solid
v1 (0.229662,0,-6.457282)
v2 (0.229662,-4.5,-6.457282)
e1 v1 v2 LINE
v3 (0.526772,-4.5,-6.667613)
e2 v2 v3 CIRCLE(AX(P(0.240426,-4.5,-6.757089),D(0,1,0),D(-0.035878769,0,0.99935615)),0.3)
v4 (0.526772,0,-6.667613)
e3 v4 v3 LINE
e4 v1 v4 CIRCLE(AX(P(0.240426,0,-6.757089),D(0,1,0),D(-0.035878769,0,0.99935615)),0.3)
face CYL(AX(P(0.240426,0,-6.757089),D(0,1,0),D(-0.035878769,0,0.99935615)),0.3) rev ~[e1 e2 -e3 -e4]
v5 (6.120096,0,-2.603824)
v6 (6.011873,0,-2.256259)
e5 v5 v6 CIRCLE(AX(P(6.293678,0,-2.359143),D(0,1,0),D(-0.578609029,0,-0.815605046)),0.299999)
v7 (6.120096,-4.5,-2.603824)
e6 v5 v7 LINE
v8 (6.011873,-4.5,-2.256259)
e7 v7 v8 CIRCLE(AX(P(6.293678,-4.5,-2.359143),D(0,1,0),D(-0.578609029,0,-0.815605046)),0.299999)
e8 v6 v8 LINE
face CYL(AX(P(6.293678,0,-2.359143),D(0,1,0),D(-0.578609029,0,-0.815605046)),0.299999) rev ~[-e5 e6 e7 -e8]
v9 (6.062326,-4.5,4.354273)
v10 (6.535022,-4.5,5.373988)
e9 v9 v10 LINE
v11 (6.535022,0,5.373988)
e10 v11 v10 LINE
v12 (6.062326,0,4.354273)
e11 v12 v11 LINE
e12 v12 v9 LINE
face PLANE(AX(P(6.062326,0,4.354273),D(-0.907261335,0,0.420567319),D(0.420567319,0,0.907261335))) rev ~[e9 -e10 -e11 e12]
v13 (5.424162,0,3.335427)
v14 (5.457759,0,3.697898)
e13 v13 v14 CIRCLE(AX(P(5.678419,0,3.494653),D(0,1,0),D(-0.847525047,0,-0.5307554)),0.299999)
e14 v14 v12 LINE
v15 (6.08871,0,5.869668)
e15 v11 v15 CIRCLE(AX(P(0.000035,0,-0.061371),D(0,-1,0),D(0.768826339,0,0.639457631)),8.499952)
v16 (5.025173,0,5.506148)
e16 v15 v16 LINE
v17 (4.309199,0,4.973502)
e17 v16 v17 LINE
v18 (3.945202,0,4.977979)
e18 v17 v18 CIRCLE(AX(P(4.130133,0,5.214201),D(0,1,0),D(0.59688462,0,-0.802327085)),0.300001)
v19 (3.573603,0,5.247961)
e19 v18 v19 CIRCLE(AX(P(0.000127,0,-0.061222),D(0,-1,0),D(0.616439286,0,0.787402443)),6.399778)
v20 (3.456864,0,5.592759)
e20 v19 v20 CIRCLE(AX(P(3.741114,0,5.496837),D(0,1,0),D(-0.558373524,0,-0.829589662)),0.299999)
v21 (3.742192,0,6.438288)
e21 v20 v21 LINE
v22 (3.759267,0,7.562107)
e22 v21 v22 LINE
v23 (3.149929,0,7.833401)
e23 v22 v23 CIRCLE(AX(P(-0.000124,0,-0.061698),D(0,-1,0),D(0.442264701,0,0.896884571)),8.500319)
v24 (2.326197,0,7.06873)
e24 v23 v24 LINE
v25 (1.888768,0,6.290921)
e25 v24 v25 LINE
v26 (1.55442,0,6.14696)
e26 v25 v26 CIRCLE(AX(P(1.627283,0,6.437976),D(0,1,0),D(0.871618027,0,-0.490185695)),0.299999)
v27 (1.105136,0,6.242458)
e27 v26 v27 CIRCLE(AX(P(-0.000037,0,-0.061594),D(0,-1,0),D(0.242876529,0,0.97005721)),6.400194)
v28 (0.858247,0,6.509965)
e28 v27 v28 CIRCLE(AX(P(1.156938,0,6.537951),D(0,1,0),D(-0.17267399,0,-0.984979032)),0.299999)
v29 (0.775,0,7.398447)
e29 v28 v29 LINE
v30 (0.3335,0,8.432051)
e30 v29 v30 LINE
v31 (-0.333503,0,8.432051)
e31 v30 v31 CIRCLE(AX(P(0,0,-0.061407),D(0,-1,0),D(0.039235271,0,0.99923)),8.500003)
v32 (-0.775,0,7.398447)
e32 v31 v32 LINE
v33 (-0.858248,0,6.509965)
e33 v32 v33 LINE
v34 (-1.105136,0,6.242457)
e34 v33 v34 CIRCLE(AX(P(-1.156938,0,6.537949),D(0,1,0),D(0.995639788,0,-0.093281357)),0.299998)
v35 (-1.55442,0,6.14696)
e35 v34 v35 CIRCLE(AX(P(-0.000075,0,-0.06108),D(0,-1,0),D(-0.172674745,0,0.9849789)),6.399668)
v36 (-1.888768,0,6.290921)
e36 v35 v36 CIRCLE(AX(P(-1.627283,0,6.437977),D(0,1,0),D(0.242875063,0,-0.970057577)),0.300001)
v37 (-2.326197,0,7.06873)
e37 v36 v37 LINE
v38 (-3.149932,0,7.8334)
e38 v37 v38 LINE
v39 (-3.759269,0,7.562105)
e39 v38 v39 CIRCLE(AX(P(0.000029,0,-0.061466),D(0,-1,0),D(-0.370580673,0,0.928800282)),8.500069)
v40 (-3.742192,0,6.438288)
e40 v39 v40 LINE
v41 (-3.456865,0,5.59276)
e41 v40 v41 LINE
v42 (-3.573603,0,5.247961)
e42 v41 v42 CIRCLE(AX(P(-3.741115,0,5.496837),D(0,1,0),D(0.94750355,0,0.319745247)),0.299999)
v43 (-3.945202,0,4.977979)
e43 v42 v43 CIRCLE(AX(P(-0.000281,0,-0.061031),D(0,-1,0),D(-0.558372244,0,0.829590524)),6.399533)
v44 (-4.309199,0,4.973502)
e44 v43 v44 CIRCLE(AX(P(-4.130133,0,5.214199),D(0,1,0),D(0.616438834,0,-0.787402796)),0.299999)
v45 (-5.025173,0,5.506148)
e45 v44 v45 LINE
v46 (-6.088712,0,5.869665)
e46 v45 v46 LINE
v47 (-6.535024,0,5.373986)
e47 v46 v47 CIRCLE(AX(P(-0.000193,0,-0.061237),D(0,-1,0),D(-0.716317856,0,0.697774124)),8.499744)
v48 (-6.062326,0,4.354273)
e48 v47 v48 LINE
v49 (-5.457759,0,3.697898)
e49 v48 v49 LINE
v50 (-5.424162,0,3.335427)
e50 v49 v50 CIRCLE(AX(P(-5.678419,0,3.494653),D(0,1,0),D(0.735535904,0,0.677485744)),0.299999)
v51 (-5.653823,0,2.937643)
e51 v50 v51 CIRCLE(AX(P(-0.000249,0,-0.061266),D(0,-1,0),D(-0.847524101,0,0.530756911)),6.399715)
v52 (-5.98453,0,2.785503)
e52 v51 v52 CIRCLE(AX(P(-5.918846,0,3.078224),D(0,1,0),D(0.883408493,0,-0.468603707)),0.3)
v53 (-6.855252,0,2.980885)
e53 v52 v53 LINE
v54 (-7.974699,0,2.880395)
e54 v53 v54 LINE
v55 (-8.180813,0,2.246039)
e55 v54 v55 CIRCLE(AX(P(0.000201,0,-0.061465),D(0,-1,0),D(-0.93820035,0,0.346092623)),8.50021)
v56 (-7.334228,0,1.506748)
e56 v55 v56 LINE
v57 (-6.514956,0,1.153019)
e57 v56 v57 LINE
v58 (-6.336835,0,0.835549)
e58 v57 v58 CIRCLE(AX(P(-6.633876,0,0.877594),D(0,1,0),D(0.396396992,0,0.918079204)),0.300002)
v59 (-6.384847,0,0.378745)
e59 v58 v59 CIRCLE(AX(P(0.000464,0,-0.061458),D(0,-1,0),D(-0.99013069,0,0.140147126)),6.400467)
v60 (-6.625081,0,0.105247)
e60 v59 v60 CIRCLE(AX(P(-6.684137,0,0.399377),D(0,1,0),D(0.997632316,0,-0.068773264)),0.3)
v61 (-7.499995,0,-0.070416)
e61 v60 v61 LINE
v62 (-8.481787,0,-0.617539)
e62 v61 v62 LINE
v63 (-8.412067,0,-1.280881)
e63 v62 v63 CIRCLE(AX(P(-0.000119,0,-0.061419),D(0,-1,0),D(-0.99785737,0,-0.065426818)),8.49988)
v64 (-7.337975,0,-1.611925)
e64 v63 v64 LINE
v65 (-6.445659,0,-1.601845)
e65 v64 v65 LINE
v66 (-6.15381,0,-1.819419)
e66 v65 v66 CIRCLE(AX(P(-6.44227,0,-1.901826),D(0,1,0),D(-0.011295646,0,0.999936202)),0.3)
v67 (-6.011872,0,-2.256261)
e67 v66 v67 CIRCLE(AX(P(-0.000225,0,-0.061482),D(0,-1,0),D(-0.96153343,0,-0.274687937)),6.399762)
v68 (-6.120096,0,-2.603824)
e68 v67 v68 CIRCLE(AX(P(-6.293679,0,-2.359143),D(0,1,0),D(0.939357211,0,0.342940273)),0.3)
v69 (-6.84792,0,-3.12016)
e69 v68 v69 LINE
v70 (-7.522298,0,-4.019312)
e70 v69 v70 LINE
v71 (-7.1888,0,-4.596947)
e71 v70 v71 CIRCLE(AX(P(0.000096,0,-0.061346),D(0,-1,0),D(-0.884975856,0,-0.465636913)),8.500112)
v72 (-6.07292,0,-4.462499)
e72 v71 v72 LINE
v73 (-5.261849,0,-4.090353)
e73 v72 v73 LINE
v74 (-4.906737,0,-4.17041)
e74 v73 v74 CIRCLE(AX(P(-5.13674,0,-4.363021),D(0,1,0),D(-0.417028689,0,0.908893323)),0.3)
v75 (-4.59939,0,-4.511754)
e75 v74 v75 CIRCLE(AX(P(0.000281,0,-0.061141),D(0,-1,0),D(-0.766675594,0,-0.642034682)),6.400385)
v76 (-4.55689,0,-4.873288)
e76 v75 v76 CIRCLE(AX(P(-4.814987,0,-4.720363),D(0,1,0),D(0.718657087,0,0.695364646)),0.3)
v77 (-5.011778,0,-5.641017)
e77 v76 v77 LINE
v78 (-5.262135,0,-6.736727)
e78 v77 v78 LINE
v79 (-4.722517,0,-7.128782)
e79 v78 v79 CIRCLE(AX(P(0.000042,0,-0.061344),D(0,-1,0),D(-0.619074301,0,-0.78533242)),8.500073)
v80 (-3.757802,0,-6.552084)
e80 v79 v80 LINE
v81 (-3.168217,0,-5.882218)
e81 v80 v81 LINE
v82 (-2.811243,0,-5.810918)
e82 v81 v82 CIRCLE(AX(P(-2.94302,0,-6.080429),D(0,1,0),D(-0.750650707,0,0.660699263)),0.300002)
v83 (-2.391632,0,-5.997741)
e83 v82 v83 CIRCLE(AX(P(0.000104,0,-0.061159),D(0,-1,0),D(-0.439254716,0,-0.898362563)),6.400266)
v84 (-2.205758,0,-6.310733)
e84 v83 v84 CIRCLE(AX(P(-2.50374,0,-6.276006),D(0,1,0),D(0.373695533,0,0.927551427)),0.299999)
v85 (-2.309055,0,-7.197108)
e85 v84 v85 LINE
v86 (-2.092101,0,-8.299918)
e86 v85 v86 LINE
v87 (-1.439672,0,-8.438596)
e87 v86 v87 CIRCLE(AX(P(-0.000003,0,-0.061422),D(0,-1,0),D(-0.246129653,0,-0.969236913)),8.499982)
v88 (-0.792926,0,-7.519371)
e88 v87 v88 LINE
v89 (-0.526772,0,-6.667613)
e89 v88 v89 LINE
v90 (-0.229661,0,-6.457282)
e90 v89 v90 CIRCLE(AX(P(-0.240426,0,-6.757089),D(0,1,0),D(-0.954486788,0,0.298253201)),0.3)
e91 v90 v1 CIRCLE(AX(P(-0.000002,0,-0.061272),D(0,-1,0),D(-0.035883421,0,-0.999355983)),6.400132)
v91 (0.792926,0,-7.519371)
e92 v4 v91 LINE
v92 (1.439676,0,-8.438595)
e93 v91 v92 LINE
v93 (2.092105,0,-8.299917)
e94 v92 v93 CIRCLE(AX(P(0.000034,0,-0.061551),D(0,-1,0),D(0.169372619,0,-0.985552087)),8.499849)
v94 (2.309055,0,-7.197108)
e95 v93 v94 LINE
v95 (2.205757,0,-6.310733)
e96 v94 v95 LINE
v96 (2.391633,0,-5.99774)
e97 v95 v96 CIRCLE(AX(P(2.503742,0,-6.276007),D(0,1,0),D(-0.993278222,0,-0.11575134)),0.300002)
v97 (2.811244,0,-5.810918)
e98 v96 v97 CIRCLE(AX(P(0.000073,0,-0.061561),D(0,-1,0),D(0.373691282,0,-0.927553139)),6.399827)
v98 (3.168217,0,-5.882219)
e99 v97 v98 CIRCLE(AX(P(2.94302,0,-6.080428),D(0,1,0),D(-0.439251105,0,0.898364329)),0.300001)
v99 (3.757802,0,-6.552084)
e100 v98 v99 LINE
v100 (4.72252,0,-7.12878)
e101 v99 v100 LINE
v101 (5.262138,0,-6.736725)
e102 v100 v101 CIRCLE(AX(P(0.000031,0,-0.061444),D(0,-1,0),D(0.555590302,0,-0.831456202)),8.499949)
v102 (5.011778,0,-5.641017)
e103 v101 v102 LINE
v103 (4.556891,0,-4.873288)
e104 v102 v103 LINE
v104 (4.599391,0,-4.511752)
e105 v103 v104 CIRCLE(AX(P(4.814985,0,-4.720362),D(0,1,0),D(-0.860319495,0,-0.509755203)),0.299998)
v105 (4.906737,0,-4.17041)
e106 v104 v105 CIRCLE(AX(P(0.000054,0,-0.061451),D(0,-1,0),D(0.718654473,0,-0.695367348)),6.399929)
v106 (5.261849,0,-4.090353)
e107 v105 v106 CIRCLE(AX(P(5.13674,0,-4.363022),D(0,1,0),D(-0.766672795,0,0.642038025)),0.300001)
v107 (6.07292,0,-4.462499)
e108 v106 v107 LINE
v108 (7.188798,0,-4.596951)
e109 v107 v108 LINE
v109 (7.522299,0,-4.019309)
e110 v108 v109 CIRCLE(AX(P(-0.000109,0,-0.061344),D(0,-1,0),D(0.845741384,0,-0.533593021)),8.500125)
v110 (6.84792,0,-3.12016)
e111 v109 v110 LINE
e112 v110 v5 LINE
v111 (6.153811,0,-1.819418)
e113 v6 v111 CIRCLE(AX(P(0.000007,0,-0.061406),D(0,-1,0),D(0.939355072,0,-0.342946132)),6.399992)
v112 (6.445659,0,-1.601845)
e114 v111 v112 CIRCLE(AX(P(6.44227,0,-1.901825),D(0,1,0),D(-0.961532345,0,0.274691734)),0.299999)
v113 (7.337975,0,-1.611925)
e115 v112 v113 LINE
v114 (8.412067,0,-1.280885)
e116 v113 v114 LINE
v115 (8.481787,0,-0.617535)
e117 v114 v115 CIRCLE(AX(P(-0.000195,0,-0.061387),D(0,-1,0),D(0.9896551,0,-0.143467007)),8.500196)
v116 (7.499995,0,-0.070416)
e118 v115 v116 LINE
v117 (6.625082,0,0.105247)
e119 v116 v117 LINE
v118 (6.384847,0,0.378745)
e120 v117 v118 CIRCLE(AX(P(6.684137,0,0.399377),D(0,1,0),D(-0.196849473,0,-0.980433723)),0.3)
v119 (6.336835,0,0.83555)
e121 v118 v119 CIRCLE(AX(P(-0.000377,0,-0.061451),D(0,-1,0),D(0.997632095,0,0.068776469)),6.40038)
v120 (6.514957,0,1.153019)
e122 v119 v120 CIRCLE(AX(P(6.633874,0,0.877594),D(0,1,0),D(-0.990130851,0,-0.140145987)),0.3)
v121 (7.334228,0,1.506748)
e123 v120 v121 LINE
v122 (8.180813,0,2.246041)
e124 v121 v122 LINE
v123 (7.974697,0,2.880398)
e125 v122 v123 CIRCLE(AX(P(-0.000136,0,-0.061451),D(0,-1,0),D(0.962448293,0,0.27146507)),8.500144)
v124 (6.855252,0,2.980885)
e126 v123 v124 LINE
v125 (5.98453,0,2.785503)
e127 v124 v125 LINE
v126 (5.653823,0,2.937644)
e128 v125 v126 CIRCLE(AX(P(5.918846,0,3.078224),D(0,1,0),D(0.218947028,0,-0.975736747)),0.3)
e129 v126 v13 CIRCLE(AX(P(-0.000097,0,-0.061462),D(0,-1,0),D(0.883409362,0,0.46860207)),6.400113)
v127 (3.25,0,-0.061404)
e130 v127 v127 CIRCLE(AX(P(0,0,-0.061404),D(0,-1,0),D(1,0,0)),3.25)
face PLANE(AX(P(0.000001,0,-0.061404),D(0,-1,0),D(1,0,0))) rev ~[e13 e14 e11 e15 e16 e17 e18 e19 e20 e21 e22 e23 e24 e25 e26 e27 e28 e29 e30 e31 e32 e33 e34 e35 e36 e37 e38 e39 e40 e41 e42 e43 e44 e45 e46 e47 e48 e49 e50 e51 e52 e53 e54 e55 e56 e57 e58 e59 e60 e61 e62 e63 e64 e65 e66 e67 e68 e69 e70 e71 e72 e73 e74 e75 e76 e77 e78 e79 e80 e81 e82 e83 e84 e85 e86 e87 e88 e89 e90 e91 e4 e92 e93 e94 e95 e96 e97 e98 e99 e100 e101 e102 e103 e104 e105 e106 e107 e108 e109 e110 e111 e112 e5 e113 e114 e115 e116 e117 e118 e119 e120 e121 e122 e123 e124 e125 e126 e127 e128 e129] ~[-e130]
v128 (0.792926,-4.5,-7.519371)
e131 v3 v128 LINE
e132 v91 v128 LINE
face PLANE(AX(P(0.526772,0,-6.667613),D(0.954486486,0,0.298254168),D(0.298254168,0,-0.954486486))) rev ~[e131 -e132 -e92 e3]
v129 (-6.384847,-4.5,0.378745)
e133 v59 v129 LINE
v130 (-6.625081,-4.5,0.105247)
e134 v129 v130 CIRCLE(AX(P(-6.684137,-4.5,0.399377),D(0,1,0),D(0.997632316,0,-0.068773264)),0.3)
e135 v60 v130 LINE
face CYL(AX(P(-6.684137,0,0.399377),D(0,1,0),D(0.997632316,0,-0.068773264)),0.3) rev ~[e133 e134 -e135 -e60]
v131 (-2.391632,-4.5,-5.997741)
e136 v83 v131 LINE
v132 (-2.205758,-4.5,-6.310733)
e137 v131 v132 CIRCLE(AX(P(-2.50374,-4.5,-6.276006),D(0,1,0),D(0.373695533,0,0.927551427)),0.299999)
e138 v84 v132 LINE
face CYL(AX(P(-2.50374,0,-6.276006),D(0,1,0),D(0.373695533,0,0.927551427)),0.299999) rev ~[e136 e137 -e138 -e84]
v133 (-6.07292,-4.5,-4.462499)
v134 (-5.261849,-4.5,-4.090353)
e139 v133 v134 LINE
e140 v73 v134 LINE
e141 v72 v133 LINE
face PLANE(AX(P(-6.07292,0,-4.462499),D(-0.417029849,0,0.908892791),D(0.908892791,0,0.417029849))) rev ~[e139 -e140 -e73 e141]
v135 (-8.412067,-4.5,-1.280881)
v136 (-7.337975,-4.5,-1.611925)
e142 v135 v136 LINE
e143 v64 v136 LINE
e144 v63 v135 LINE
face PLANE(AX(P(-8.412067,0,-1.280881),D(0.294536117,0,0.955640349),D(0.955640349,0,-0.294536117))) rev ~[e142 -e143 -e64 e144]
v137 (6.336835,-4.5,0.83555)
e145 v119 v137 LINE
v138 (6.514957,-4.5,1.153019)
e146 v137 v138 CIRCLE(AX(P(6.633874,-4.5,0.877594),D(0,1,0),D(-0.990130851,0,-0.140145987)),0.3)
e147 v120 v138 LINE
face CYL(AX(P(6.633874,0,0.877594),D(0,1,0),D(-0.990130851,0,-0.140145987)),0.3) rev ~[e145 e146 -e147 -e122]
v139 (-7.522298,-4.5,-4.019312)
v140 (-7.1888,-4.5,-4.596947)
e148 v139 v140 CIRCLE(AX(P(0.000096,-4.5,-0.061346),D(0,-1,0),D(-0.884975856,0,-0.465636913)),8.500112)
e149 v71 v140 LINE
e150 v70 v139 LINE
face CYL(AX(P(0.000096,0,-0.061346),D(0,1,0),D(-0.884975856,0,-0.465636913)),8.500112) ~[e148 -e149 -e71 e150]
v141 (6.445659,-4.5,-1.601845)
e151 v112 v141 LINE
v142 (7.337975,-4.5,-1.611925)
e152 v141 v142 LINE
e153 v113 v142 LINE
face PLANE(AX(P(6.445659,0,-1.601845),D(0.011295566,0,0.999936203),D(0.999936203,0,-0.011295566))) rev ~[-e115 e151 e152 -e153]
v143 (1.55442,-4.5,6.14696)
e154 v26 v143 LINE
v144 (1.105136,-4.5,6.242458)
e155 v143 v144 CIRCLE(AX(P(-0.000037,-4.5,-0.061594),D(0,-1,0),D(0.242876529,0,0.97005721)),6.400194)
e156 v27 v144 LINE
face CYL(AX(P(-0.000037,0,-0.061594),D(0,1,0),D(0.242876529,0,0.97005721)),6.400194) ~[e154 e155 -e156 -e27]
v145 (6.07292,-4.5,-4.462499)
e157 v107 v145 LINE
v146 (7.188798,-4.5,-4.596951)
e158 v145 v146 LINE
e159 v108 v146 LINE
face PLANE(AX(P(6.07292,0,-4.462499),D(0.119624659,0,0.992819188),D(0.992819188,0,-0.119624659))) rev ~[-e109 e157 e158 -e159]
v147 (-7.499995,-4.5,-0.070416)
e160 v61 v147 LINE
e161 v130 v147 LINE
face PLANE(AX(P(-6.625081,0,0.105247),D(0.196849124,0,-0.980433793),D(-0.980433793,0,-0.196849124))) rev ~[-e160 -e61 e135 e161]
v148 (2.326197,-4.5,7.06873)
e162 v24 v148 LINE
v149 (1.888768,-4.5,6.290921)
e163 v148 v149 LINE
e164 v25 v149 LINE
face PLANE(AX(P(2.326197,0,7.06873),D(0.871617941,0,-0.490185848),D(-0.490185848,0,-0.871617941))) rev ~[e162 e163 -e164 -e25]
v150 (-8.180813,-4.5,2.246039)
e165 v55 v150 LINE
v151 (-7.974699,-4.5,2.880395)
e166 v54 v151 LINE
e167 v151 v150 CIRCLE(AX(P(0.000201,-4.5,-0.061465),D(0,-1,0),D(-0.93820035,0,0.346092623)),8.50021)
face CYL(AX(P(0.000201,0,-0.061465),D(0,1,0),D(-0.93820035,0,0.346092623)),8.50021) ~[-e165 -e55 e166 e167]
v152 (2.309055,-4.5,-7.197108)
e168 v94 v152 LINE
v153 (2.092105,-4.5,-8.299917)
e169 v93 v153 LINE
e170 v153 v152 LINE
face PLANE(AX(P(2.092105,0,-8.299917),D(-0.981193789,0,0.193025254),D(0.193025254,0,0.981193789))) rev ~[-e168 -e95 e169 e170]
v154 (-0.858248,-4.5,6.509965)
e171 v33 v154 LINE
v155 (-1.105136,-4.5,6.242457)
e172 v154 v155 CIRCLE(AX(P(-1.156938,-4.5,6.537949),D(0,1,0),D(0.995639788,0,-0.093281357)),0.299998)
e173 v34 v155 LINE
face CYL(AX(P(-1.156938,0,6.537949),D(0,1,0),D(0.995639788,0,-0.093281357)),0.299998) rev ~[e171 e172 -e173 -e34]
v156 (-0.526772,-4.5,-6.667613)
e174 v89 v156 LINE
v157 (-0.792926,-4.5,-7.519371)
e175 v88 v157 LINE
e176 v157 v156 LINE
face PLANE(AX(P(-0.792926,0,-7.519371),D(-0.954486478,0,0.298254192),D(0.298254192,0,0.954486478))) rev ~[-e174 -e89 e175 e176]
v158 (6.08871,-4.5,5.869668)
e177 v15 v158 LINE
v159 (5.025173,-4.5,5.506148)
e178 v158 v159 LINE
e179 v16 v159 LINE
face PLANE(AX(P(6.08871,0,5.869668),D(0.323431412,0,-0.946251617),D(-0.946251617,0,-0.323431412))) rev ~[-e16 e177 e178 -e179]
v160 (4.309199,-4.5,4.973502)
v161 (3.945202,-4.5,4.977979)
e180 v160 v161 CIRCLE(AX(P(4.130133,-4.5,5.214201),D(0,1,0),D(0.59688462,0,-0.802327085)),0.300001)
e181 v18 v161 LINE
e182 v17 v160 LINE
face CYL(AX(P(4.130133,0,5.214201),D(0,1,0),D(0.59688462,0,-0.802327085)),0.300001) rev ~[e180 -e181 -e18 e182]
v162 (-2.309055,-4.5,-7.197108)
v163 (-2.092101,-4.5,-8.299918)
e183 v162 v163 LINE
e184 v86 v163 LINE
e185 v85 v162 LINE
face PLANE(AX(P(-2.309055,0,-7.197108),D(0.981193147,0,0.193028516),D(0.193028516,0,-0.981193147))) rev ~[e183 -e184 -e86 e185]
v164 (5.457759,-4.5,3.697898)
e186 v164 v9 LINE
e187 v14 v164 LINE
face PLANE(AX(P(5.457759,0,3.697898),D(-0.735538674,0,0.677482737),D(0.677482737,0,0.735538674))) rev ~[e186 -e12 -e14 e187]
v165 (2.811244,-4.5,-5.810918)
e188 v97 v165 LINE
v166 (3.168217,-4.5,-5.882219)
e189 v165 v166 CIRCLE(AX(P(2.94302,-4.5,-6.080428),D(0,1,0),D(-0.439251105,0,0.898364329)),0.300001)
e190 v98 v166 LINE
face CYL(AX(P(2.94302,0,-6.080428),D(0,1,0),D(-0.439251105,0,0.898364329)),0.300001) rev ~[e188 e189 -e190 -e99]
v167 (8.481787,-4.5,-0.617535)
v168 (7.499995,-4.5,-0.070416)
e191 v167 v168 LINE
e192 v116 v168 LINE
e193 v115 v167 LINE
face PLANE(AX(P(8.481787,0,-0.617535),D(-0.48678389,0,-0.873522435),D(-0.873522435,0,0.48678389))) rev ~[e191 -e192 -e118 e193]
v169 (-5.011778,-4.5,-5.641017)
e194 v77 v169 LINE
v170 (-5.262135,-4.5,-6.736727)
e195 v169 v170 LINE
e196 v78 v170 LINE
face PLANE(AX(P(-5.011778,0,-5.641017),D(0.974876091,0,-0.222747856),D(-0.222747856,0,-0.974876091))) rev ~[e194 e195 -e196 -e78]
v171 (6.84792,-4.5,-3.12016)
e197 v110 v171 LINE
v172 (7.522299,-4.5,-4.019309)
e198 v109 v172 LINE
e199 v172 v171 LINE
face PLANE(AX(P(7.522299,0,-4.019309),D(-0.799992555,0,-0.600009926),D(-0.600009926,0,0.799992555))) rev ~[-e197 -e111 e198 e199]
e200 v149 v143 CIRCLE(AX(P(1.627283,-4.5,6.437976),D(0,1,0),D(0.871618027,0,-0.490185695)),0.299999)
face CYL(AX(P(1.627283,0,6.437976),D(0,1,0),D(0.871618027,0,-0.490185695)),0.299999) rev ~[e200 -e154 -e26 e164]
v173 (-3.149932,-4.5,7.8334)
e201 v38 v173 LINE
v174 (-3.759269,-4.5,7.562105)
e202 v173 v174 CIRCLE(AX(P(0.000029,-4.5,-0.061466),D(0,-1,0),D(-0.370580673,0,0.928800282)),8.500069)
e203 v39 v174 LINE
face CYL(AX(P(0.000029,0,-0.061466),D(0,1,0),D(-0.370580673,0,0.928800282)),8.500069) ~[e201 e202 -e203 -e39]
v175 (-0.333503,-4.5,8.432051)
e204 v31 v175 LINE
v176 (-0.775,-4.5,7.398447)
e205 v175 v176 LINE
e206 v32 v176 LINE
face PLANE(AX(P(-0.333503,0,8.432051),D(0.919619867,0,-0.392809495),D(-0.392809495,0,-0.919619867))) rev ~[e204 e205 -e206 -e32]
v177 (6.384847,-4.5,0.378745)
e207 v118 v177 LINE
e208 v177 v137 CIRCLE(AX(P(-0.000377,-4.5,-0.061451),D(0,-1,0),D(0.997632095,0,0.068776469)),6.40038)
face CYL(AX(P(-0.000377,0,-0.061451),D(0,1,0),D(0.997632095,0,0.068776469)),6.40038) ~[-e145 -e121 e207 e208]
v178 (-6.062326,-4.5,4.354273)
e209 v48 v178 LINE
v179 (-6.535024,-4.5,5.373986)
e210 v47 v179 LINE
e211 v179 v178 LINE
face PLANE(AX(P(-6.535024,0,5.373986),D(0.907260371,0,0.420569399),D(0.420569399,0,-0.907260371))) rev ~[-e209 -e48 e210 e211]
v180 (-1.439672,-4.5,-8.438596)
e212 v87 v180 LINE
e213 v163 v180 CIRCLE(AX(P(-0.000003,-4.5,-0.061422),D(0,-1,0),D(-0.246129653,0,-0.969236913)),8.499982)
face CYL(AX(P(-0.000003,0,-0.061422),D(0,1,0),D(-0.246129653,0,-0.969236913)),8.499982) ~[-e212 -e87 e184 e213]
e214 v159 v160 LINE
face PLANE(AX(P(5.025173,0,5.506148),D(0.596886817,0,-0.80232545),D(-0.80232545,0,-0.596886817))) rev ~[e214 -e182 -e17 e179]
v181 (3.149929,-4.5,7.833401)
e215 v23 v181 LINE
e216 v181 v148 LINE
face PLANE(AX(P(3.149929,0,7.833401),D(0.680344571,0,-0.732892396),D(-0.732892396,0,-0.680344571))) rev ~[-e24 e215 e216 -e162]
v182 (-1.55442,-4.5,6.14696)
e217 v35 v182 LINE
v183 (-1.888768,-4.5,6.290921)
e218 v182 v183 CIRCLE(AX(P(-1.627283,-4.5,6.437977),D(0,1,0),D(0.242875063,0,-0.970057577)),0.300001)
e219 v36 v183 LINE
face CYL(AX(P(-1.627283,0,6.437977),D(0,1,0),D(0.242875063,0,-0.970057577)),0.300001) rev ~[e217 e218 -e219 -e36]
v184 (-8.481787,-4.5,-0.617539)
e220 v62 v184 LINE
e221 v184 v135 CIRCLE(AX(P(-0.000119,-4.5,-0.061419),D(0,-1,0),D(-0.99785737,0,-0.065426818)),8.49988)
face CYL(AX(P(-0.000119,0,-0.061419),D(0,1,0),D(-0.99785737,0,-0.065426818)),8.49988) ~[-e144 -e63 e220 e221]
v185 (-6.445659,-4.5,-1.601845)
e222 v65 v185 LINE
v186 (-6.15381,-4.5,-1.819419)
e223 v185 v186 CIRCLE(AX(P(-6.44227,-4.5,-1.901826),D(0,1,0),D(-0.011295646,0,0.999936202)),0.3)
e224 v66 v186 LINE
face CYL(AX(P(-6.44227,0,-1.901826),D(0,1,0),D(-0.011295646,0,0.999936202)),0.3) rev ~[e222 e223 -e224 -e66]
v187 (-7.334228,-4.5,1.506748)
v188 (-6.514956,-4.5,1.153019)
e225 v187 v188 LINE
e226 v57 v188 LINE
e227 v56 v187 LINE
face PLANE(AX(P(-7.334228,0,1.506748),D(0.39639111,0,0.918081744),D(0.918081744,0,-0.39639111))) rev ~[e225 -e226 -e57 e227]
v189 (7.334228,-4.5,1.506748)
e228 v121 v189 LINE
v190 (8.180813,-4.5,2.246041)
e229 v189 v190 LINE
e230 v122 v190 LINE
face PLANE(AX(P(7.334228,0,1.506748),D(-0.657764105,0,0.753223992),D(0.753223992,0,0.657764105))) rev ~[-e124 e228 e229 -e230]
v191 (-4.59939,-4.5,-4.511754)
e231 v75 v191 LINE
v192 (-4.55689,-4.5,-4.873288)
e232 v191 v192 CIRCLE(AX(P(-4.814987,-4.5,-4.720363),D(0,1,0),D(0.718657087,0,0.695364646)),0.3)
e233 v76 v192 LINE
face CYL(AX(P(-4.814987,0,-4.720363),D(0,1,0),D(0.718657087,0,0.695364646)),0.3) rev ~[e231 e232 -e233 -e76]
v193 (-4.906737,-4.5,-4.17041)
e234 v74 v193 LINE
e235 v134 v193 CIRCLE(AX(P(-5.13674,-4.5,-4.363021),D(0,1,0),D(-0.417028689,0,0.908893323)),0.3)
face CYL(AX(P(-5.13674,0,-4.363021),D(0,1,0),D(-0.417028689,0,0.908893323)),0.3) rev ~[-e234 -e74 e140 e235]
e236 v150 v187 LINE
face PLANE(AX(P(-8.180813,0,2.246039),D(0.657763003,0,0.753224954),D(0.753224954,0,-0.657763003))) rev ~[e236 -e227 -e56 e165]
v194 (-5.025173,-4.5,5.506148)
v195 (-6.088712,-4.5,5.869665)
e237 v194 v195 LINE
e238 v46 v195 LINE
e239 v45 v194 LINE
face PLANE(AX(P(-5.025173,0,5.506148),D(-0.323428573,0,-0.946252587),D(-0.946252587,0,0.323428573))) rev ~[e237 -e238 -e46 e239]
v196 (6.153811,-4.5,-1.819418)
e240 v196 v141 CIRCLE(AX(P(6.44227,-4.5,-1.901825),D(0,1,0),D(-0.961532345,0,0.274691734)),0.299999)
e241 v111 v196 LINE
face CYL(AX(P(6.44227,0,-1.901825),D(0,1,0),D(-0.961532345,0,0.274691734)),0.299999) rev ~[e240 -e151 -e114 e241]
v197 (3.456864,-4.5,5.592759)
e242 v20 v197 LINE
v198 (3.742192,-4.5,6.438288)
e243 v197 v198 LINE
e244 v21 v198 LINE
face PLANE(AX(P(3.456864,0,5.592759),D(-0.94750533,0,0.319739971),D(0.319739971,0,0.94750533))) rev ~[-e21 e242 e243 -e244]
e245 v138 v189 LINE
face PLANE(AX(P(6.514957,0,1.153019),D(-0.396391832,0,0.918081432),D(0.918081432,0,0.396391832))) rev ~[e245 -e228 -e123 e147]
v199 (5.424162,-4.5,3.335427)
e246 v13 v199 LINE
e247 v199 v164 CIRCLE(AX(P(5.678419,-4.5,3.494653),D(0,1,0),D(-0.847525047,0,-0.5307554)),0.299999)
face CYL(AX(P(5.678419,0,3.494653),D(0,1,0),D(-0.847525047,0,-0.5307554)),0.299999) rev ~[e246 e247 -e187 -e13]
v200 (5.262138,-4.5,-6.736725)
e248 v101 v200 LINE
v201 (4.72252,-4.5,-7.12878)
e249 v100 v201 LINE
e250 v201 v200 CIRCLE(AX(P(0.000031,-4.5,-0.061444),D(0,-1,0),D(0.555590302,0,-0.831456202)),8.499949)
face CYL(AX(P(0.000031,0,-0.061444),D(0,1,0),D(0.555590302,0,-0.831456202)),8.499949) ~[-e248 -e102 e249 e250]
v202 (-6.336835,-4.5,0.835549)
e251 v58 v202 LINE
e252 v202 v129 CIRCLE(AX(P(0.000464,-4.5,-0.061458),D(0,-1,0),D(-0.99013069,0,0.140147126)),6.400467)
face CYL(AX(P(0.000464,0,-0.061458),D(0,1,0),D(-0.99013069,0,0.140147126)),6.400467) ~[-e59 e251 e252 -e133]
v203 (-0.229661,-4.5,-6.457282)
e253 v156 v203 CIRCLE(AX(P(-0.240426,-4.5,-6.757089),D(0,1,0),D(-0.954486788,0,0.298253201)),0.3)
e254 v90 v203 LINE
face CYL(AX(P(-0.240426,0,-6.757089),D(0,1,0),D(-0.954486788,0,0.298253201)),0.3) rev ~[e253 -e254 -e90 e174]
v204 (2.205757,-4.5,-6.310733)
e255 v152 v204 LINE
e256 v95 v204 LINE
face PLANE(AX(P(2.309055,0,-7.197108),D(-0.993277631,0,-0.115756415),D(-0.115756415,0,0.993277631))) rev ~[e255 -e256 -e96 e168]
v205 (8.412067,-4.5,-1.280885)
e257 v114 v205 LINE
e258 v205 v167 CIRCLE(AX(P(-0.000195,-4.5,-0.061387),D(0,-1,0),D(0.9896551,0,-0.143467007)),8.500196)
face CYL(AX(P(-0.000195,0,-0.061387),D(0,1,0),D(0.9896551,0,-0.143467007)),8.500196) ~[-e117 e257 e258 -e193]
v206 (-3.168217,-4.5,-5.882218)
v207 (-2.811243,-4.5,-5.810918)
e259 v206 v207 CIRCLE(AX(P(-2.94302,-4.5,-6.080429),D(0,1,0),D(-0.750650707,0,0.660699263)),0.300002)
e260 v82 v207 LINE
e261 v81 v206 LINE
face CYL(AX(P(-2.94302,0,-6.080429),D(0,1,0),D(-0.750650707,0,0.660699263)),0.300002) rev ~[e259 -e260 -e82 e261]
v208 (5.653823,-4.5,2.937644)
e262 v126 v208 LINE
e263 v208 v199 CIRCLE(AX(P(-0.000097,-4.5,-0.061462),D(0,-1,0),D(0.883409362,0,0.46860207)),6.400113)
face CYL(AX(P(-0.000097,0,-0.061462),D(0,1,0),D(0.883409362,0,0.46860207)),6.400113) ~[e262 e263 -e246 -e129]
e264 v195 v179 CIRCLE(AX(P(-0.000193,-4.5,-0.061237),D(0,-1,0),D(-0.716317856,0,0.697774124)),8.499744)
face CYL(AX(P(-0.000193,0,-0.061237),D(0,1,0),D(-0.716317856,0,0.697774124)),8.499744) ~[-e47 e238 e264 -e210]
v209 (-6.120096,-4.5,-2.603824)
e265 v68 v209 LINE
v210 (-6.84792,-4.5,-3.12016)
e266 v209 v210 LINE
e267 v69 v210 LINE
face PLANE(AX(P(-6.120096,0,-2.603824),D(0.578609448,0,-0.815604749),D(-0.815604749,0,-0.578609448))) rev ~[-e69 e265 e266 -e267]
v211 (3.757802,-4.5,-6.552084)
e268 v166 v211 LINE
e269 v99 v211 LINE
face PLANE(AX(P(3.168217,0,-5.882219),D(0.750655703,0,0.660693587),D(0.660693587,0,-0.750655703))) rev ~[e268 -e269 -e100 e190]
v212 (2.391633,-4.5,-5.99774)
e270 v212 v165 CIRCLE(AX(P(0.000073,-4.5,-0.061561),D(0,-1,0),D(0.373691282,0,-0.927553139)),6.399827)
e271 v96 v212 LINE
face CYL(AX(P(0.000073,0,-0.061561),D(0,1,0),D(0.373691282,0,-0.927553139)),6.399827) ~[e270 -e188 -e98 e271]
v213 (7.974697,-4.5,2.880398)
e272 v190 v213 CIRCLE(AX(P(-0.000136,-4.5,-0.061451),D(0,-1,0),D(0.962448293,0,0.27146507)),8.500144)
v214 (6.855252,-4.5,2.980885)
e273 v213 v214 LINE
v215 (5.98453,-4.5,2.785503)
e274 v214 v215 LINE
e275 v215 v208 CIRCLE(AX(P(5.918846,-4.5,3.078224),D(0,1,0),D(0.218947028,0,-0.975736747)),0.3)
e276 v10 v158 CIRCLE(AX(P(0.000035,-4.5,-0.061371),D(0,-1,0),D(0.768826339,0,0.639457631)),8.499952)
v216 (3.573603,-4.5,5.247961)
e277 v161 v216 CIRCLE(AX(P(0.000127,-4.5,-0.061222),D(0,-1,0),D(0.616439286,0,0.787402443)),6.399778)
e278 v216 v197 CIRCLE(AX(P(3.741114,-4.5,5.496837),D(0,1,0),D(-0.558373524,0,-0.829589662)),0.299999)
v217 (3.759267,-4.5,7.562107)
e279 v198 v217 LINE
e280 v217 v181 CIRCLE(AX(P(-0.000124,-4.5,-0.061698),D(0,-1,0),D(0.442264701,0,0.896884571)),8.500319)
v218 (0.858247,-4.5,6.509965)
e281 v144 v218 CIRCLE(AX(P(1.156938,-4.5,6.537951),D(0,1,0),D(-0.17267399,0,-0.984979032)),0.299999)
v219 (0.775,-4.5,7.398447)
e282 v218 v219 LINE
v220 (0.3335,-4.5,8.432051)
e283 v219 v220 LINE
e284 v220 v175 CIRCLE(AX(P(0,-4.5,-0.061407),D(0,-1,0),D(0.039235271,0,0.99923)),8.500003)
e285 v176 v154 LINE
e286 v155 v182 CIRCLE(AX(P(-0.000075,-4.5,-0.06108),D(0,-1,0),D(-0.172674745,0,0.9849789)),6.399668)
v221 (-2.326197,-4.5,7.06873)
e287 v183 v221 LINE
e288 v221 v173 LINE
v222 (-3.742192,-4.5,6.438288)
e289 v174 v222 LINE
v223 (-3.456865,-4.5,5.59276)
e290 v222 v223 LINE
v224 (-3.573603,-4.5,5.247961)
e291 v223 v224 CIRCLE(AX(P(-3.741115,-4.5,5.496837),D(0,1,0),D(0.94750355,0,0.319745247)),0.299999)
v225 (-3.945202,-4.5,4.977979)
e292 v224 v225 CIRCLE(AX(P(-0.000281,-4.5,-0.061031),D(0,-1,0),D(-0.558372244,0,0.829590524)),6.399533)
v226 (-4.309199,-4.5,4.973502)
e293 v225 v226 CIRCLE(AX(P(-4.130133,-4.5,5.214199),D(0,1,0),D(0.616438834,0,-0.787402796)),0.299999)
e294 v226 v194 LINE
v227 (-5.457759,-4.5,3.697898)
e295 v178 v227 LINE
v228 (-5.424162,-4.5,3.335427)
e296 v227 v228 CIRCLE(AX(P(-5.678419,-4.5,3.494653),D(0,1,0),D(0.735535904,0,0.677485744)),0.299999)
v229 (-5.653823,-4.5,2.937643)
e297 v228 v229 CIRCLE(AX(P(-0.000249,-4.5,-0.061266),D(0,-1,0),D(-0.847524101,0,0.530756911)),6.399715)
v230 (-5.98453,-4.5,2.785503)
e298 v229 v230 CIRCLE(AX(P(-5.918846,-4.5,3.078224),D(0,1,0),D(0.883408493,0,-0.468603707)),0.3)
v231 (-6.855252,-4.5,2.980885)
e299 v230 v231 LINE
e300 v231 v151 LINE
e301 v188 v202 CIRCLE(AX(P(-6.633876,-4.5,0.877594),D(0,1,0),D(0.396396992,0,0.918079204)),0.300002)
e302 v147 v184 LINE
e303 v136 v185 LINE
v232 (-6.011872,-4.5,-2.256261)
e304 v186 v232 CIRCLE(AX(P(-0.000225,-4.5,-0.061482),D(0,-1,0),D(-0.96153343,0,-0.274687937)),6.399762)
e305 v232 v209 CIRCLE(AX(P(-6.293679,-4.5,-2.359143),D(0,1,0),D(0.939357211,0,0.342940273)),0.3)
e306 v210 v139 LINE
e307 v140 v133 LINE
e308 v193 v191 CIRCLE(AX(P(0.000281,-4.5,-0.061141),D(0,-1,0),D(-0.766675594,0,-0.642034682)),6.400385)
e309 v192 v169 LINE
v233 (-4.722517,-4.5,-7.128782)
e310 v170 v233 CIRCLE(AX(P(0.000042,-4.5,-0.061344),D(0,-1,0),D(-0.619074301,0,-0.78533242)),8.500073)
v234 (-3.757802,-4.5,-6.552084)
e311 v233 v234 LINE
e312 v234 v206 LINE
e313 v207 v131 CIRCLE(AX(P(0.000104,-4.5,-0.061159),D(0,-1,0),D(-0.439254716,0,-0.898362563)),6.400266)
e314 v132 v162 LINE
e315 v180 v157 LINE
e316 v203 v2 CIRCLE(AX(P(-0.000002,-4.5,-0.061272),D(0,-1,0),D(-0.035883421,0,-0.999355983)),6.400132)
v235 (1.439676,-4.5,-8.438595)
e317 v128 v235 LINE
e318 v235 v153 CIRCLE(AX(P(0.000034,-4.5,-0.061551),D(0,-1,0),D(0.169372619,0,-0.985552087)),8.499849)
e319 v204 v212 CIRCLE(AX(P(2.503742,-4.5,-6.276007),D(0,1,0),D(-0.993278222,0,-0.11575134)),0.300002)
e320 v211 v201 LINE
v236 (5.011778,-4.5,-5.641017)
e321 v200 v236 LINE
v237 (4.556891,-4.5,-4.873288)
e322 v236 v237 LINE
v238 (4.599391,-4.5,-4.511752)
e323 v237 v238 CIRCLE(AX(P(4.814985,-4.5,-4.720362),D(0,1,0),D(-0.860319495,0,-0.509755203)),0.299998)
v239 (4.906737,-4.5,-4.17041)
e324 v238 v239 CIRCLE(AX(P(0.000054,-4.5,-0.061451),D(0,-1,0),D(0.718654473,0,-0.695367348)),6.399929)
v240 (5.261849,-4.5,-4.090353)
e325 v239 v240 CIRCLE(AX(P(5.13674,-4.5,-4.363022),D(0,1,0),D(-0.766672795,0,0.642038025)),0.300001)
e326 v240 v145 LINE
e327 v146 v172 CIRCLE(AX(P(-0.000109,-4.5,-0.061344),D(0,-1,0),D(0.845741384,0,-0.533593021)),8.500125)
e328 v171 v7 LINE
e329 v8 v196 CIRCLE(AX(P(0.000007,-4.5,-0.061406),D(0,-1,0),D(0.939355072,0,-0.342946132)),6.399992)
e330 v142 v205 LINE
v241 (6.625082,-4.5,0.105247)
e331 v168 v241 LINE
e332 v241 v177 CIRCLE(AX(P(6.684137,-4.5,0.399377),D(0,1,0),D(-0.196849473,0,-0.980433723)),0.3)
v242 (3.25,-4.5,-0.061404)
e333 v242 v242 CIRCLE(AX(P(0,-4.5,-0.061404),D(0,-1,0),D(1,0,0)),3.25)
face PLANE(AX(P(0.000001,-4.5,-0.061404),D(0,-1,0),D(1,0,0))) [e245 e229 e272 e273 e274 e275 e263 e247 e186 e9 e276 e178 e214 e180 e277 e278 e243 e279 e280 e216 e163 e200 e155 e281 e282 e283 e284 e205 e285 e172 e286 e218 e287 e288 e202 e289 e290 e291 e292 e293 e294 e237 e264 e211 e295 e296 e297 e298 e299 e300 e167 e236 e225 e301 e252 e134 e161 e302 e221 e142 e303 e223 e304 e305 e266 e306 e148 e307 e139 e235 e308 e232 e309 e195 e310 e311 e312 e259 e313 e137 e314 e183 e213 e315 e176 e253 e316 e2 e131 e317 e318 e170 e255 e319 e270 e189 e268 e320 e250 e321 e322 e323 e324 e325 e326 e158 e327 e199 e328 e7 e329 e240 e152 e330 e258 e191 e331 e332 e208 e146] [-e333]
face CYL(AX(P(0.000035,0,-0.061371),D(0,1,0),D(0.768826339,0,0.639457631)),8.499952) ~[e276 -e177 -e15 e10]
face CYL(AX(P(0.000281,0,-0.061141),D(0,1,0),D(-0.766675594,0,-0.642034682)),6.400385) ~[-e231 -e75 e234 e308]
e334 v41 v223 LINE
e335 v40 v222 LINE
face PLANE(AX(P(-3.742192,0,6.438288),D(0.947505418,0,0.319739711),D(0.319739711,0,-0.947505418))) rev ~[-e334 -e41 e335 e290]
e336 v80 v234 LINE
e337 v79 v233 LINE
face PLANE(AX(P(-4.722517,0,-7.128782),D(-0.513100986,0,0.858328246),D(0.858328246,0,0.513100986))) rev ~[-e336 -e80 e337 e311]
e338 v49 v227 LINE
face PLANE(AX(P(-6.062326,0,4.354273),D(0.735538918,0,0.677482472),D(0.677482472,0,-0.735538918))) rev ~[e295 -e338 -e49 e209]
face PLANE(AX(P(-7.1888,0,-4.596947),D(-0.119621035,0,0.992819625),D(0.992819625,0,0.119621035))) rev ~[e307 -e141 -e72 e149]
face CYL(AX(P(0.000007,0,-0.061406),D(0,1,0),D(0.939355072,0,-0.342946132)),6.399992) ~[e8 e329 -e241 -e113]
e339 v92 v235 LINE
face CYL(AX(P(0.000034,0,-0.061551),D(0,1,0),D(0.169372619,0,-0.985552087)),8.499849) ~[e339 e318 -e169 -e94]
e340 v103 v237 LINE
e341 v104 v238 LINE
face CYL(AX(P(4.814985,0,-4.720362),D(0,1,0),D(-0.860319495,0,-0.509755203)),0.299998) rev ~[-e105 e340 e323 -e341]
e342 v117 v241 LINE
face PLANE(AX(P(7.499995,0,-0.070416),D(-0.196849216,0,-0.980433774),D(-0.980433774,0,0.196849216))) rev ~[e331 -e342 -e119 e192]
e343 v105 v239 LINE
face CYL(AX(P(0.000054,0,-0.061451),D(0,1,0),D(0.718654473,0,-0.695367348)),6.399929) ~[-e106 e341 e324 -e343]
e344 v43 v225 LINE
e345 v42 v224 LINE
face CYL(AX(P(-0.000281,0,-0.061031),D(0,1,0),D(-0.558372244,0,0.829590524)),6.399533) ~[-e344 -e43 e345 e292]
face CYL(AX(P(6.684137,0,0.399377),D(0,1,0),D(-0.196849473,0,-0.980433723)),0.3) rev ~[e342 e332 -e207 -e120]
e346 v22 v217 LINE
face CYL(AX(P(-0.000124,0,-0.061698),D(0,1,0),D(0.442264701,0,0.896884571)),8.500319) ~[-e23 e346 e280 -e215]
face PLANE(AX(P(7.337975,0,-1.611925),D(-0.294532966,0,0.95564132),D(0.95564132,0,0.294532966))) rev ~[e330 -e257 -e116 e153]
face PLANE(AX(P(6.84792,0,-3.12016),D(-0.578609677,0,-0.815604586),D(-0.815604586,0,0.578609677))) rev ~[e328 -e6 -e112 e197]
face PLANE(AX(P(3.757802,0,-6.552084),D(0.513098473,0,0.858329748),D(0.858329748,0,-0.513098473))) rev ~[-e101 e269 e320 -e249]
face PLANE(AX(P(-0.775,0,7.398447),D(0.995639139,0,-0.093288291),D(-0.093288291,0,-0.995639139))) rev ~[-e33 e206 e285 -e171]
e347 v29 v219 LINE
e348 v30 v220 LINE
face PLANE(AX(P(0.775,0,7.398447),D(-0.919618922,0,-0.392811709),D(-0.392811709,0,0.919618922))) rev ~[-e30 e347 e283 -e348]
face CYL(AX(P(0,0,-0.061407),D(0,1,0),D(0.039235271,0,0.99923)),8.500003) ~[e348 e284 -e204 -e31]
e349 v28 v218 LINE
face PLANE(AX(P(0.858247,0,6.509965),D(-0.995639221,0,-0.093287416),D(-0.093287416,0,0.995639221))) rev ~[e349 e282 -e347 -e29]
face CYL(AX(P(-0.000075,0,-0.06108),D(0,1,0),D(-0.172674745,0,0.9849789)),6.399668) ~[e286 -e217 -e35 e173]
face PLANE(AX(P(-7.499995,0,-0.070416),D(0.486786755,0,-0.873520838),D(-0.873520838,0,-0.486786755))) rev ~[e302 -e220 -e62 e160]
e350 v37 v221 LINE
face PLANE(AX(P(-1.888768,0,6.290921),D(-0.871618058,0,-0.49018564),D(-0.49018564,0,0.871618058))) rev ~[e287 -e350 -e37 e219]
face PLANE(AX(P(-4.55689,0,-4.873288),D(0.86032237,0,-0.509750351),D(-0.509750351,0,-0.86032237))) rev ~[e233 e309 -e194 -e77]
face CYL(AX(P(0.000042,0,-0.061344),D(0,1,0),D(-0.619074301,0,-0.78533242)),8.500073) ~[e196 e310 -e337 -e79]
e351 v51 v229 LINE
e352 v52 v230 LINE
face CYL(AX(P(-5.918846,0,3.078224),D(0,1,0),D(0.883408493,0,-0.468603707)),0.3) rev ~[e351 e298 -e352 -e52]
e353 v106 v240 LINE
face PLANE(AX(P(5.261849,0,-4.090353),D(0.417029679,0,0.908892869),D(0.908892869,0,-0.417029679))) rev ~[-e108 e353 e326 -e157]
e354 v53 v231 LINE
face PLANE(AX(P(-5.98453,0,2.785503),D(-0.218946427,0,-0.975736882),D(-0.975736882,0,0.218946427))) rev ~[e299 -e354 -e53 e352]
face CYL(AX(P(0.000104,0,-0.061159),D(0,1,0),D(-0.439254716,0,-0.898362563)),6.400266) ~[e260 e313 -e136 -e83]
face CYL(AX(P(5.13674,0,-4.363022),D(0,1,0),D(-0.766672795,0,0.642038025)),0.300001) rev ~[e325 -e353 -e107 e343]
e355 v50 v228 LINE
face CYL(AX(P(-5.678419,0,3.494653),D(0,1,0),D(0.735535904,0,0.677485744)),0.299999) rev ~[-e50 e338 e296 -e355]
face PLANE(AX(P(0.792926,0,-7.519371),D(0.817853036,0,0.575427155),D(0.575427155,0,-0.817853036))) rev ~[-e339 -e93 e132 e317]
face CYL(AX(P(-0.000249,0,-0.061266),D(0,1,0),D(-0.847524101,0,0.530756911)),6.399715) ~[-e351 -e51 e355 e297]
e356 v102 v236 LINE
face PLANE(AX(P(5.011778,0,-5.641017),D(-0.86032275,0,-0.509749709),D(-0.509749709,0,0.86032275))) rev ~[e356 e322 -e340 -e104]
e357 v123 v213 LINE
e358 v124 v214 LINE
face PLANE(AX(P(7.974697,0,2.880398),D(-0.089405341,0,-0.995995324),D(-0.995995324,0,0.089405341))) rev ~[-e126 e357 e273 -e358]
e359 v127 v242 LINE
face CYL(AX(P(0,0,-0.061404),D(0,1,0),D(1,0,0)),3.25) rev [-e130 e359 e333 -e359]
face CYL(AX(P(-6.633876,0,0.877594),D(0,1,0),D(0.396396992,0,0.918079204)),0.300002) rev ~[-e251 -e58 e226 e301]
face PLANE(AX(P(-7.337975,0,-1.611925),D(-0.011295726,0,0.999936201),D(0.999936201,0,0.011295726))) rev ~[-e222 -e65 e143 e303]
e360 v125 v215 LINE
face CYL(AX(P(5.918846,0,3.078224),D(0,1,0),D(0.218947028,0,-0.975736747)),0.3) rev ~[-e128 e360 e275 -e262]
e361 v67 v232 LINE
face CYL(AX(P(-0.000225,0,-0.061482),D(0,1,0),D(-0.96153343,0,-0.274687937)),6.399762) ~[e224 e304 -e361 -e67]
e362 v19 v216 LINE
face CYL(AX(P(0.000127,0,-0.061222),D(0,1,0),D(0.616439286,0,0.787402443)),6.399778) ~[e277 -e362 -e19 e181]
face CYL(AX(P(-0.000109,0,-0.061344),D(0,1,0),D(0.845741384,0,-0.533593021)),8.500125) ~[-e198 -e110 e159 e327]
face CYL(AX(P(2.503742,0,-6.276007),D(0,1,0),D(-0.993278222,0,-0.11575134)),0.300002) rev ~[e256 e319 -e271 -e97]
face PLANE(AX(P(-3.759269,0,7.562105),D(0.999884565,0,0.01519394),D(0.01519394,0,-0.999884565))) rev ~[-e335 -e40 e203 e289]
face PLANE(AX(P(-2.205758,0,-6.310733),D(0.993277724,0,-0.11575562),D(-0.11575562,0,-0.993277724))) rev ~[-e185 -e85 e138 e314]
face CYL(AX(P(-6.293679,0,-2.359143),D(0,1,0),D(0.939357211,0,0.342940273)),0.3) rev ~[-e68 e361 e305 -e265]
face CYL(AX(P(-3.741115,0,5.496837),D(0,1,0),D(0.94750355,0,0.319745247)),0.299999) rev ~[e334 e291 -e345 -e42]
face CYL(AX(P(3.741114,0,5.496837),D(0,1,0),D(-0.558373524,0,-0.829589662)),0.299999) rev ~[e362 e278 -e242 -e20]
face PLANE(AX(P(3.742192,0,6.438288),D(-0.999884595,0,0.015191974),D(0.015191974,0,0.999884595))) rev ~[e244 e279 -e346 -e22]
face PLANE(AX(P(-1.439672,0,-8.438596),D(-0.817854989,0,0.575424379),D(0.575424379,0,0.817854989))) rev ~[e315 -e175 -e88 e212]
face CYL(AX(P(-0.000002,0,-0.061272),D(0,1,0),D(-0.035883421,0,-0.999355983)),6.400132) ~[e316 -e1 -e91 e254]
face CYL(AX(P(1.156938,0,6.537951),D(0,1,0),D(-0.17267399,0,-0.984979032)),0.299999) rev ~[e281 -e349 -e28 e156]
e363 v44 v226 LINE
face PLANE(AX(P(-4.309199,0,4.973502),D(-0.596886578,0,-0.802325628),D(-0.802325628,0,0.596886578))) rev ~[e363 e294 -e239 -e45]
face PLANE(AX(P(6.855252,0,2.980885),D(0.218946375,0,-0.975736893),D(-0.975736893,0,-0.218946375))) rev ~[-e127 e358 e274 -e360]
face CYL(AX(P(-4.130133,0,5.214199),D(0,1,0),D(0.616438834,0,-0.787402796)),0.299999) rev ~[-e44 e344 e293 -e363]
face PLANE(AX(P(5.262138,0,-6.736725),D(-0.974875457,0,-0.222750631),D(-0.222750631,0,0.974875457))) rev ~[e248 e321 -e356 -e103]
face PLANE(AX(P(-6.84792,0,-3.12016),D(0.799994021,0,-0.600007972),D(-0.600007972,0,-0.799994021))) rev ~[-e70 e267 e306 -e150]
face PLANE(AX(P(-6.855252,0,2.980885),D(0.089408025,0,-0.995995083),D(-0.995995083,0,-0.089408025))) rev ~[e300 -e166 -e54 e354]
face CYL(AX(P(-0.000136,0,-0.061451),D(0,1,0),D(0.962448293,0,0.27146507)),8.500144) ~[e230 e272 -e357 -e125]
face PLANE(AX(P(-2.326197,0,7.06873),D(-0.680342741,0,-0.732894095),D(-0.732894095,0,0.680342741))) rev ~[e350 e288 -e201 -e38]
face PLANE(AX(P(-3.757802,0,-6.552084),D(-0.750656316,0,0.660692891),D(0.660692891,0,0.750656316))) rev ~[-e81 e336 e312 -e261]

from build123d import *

# Parameters (mm, degrees)
F0_R     = 3.25
F1_DEPTH = 4.5


# Not quite as in the source:
# - ends of sketch curves that miss each other by under 0.0002 mm in the source are joined


with BuildPart() as f1:
    # F0 (on Front) → F1 (new body)
    with BuildSketch(Plane.XZ):
        with BuildLine():
            ThreePointArc((-6.3848473051, 0.378745021), (-6.458741388, 0.201395137), (-6.6250810223, 0.1052471112))
            Line((-6.6250810223, 0.1052471112), (-7.499995, -0.070416))
            Line((-7.499995, -0.070416), (-8.481787, -0.617539))
            ThreePointArc((-8.481787, -0.617539), (-8.4534361937, -0.9498951475), (-8.4120672698, -1.2808810391))
            Line((-8.4120672698, -1.2808810391), (-7.337975, -1.611925))
            Line((-7.337975, -1.611925), (-6.445659, -1.601845))
            ThreePointArc((-6.445659, -1.601845), (-6.2629631412, -1.6613077046), (-6.1538101366, -1.819419039))
            ThreePointArc((-6.1538101366, -1.819419039), (-6.0867618577, -2.039112292), (-6.0118718389, -2.2562609412))
            ThreePointArc((-6.0118718389, -2.2562609412), (-6.0072434399, -2.4483319562), (-6.120095855, -2.6038242044))
            Line((-6.120095855, -2.6038242044), (-6.84792, -3.12016))
            Line((-6.84792, -3.12016), (-7.522298, -4.019312))
            ThreePointArc((-7.522298, -4.019312), (-7.3612165371, -4.3114029523), (-7.1888002117, -4.5969471336))
            Line((-7.1888002117, -4.5969471336), (-6.07292, -4.462499))
            Line((-6.07292, -4.462499), (-5.261849, -4.090353))
            ThreePointArc((-5.261849, -4.090353), (-5.0707630565, -4.0703658396), (-4.9067374821, -4.1704104038))
            ThreePointArc((-4.9067374821, -4.1704104038), (-4.7561274158, -4.343839289), (-4.5993898038, -4.5117538102))
            ThreePointArc((-4.5993898038, -4.5117538102), (-4.5170386347, -4.6853377004), (-4.5568904277, -4.8732883391))
            Line((-4.5568904277, -4.8732883391), (-5.011778, -5.641017))
            Line((-5.011778, -5.641017), (-5.262135, -6.736727))
            ThreePointArc((-5.262135, -6.736727), (-4.9961722078, -6.9380502226), (-4.7225170454, -7.128782068))
            Line((-4.7225170454, -7.128782068), (-3.757802, -6.552084))
            Line((-3.757802, -6.552084), (-3.168217, -5.882218))
            ThreePointArc((-3.168217, -5.882218), (-3.0017803181, -5.7862379026), (-2.8112432041, -5.8109184175))
            ThreePointArc((-2.8112432041, -5.8109184175), (-2.6031126369, -5.9080957654), (-2.3916319825, -5.9977409564))
            ThreePointArc((-2.3916319825, -5.9977409564), (-2.2457975094, -6.1228225948), (-2.2057577098, -6.3107329173))
            Line((-2.2057577098, -6.3107329173), (-2.309055, -7.197108))
            Line((-2.309055, -7.197108), (-2.092101, -8.299918))
            ThreePointArc((-2.092101, -8.299918), (-1.7672462291, -8.3756592743), (-1.4396719873, -8.4385959262))
            Line((-1.4396719873, -8.4385959262), (-0.792926, -7.519371))
            Line((-0.792926, -7.519371), (-0.526772, -6.667613))
            ThreePointArc((-0.526772, -6.667613), (-0.4137637804, -6.5122339125), (-0.2296610073, -6.457282204))
            ThreePointArc((-0.2296610073, -6.457282204), (2.4984e-06, -6.461404), (0.229662, -6.457281998))
            ThreePointArc((0.229662, -6.457281998), (0.4137637804, -6.5122339125), (0.5267720218, -6.6676129932))
            Line((0.5267720218, -6.6676129932), (0.792926, -7.519371))
            Line((0.792926, -7.519371), (1.439676, -8.438595))
            ThreePointArc((1.439676, -8.438595), (1.7672522889, -8.3756579862), (2.0921050032, -8.2999170124))
            Line((2.0921050032, -8.2999170124), (2.309055, -7.197108))
            Line((2.309055, -7.197108), (2.205757, -6.310733))
            ThreePointArc((2.205757, -6.310733), (2.2457975094, -6.1228225948), (2.3916327595, -5.9977404031))
            ThreePointArc((2.3916327595, -5.9977404031), (2.6031159206, -5.9080943034), (2.8112438605, -5.8109177148))
            ThreePointArc((2.8112438605, -5.8109177148), (3.0017803181, -5.7862379026), (3.1682168748, -5.8822191102))
            Line((3.1682168748, -5.8822191102), (3.757802, -6.552084))
            Line((3.757802, -6.552084), (4.72252, -7.12878))
            ThreePointArc((4.72252, -7.12878), (4.9961769033, -6.9380468111), (5.2621377529, -6.7367246866))
            Line((5.2621377529, -6.7367246866), (5.011778, -5.641017))
            Line((5.011778, -5.641017), (4.556891, -4.873288))
            ThreePointArc((4.556891, -4.873288), (4.5170386766, -4.6853373435), (4.599391221, -4.5117522139))
            ThreePointArc((4.599391221, -4.5117522139), (4.7561281073, -4.3438385211), (4.9067371021, -4.1704100855))
            ThreePointArc((4.9067371021, -4.1704100855), (5.0707626825, -4.0703659239), (5.2618489304, -4.0903531516))
            Line((5.2618489304, -4.0903531516), (6.07292, -4.462499))
            Line((6.07292, -4.462499), (7.188798, -4.596951))
            ThreePointArc((7.188798, -4.596951), (7.361216975, -4.3114021938), (7.5222993001, -4.0193091579))
            Line((7.5222993001, -4.0193091579), (6.84792, -3.12016))
            Line((6.84792, -3.12016), (6.120096, -2.603824))
            ThreePointArc((6.120096, -2.603824), (6.0072434399, -2.4483319562), (6.0118725915, -2.2562588509))
            ThreePointArc((6.0118725915, -2.2562588509), (6.0867621941, -2.0391112566), (6.153810771, -1.8194179346))
            ThreePointArc((6.153810771, -1.8194179346), (6.2629631412, -1.6613077046), (6.4456589984, -1.6018451428))
            Line((6.4456589984, -1.6018451428), (7.337975, -1.611925))
            Line((7.337975, -1.611925), (8.412067, -1.280885))
            ThreePointArc((8.412067, -1.280885), (8.4534363514, -0.9498936467), (8.481787446, -0.6175350292))
            Line((8.481787446, -0.6175350292), (7.499995, -0.070416))
            Line((7.499995, -0.070416), (6.625082, 0.105247))
            ThreePointArc((6.625082, 0.105247), (6.4587417115, 0.2013947687), (6.3848473051, 0.378745021))
            ThreePointArc((6.3848473051, 0.378745021), (6.3649400086, 0.6075793237), (6.3368346677, 0.835549953))
            ThreePointArc((6.3368346677, 0.835549953), (6.3722414368, 1.0243877393), (6.5149571212, 1.1530187192))
            Line((6.5149571212, 1.1530187192), (7.334228, 1.506748))
            Line((7.334228, 1.506748), (8.180813, 2.246041))
            ThreePointArc((8.180813, 2.246041), (8.0839798549, 2.5652420945), (7.974697483, 2.8803981782))
            Line((7.974697483, 2.8803981782), (6.855252, 2.980885))
            Line((6.855252, 2.980885), (5.98453, 2.785503))
            ThreePointArc((5.98453, 2.785503), (5.7934636286, 2.8056817814), (5.6538228924, 2.9376439429))
            ThreePointArc((5.6538228924, 2.9376439429), (5.5425619412, 3.1385971137), (5.4241623811, 3.3354272386))
            ThreePointArc((5.4241623811, 3.3354272386), (5.3797004129, 3.5223406923), (5.4577587633, 3.697898218))
            Line((5.4577587633, 3.697898218), (6.062326, 4.354273))
            Line((6.062326, 4.354273), (6.535022, 5.373988))
            ThreePointArc((6.535022, 5.373988), (6.3167298633, 5.6262074349), (6.088709809, 5.8696678139))
            Line((6.088709809, 5.8696678139), (5.025173, 5.506148))
            Line((5.025173, 5.506148), (4.309199, 4.973502))
            ThreePointArc((4.309199, 4.973502), (4.1264437672, 4.9142226849), (3.9452018311, 4.9779787843))
            ThreePointArc((3.9452018311, 4.9779787843), (3.7618245482, 5.1163055389), (3.5736032135, 5.2479613173))
            ThreePointArc((3.5736032135, 5.2479613173), (3.4569607105, 5.4006300799), (3.4568644648, 5.5927591806))
            Line((3.4568644648, 5.5927591806), (3.742192, 6.438288))
            Line((3.742192, 6.438288), (3.759267, 7.562107))
            ThreePointArc((3.759267, 7.562107), (3.4572596135, 7.7037332148), (3.1499290285, 7.8334010714))
            Line((3.1499290285, 7.8334010714), (2.326197, 7.06873))
            Line((2.326197, 7.06873), (1.888768, 6.290921))
            ThreePointArc((1.888768, 6.290921), (1.7459243673, 6.1624334899), (1.554419964, 6.1469598562))
            ThreePointArc((1.554419964, 6.1469598562), (1.3306339934, 6.1987408207), (1.1051359772, 6.2424578697))
            ThreePointArc((1.1051359772, 6.2424578697), (0.9364810051, 6.3344853457), (0.8582472195, 6.5099649269))
            Line((0.8582472195, 6.5099649269), (0.775, 7.398447))
            Line((0.775, 7.398447), (0.3335, 8.432051))
            ThreePointArc((0.3335, 8.432051), (-1.4988e-06, 8.438596), (-0.3335029952, 8.4320508773))
            Line((-0.3335029952, 8.4320508773), (-0.775, 7.398447))
            Line((-0.775, 7.398447), (-0.858248, 6.509965))
            ThreePointArc((-0.858248, 6.509965), (-0.9364806674, 6.3344857115), (-1.1051359033, 6.2424574482))
            ThreePointArc((-1.1051359033, 6.2424574482), (-1.3306359057, 6.1987404142), (-1.5544199034, 6.146959614))
            ThreePointArc((-1.5544199034, 6.146959614), (-1.7459243673, 6.1624334899), (-1.8887681854, 6.2909208957))
            Line((-1.8887681854, 6.2909208957), (-2.326197, 7.06873))
            Line((-2.326197, 7.06873), (-3.149932, 7.8334))
            ThreePointArc((-3.149932, 7.8334), (-3.4572626886, 7.7037318457), (-3.759269185, 7.5621053752))
            Line((-3.759269185, 7.5621053752), (-3.742192, 6.438288))
            Line((-3.742192, 6.438288), (-3.456865, 5.59276))
            ThreePointArc((-3.456865, 5.59276), (-3.4569605775, 5.4006304728), (-3.5736028777, 5.2479608182))
            ThreePointArc((-3.5736028777, 5.2479608182), (-3.7618263316, 5.1163042431), (-3.9452020076, 4.9779790098))
            ThreePointArc((-3.9452020076, 4.9779790098), (-4.1264437672, 4.9142226849), (-4.3091988413, 4.9735022134))
            Line((-4.3091988413, 4.9735022134), (-5.025173, 5.506148))
            Line((-5.025173, 5.506148), (-6.088712, 5.869665))
            ThreePointArc((-6.088712, 5.869665), (-6.3167319914, 5.6262050713), (-6.5350238583, 5.3739858822))
            Line((-6.5350238583, 5.3739858822), (-6.062326, 4.354273))
            Line((-6.062326, 4.354273), (-5.457759, 3.697898))
            ThreePointArc((-5.457759, 3.697898), (-5.3797004129, 3.5223406923), (-5.4241620701, 3.3354270439))
            ThreePointArc((-5.4241620701, 3.3354270439), (-5.5425631892, 3.1385949521), (-5.6538231778, 2.9376430943))
            ThreePointArc((-5.6538231778, 2.9376430943), (-5.7934636286, 2.8056817814), (-5.9845300103, 2.785502954))
            Line((-5.9845300103, 2.785502954), (-6.855252, 2.980885))
            Line((-6.855252, 2.980885), (-7.974699, 2.880395))
            ThreePointArc((-7.974699, 2.880395), (-8.0839806406, 2.5652396762), (-8.1808133092, 2.2460390872))
            Line((-8.1808133092, 2.2460390872), (-7.334228, 1.506748))
            Line((-7.334228, 1.506748), (-6.514956, 1.153019))
            ThreePointArc((-6.514956, 1.153019), (-6.3722414368, 1.0243877393), (-6.3368349167, 0.8355489882))
            ThreePointArc((-6.3368349167, 0.8355489882), (-6.3649402163, 0.6075773468), (-6.3848473051, 0.378745021))
        make_face()
        with Locations((0, -0.061404)):
            Circle(F0_R, mode=Mode.SUBTRACT)
    extrude(amount=F1_DEPTH)


solid = f1.part
